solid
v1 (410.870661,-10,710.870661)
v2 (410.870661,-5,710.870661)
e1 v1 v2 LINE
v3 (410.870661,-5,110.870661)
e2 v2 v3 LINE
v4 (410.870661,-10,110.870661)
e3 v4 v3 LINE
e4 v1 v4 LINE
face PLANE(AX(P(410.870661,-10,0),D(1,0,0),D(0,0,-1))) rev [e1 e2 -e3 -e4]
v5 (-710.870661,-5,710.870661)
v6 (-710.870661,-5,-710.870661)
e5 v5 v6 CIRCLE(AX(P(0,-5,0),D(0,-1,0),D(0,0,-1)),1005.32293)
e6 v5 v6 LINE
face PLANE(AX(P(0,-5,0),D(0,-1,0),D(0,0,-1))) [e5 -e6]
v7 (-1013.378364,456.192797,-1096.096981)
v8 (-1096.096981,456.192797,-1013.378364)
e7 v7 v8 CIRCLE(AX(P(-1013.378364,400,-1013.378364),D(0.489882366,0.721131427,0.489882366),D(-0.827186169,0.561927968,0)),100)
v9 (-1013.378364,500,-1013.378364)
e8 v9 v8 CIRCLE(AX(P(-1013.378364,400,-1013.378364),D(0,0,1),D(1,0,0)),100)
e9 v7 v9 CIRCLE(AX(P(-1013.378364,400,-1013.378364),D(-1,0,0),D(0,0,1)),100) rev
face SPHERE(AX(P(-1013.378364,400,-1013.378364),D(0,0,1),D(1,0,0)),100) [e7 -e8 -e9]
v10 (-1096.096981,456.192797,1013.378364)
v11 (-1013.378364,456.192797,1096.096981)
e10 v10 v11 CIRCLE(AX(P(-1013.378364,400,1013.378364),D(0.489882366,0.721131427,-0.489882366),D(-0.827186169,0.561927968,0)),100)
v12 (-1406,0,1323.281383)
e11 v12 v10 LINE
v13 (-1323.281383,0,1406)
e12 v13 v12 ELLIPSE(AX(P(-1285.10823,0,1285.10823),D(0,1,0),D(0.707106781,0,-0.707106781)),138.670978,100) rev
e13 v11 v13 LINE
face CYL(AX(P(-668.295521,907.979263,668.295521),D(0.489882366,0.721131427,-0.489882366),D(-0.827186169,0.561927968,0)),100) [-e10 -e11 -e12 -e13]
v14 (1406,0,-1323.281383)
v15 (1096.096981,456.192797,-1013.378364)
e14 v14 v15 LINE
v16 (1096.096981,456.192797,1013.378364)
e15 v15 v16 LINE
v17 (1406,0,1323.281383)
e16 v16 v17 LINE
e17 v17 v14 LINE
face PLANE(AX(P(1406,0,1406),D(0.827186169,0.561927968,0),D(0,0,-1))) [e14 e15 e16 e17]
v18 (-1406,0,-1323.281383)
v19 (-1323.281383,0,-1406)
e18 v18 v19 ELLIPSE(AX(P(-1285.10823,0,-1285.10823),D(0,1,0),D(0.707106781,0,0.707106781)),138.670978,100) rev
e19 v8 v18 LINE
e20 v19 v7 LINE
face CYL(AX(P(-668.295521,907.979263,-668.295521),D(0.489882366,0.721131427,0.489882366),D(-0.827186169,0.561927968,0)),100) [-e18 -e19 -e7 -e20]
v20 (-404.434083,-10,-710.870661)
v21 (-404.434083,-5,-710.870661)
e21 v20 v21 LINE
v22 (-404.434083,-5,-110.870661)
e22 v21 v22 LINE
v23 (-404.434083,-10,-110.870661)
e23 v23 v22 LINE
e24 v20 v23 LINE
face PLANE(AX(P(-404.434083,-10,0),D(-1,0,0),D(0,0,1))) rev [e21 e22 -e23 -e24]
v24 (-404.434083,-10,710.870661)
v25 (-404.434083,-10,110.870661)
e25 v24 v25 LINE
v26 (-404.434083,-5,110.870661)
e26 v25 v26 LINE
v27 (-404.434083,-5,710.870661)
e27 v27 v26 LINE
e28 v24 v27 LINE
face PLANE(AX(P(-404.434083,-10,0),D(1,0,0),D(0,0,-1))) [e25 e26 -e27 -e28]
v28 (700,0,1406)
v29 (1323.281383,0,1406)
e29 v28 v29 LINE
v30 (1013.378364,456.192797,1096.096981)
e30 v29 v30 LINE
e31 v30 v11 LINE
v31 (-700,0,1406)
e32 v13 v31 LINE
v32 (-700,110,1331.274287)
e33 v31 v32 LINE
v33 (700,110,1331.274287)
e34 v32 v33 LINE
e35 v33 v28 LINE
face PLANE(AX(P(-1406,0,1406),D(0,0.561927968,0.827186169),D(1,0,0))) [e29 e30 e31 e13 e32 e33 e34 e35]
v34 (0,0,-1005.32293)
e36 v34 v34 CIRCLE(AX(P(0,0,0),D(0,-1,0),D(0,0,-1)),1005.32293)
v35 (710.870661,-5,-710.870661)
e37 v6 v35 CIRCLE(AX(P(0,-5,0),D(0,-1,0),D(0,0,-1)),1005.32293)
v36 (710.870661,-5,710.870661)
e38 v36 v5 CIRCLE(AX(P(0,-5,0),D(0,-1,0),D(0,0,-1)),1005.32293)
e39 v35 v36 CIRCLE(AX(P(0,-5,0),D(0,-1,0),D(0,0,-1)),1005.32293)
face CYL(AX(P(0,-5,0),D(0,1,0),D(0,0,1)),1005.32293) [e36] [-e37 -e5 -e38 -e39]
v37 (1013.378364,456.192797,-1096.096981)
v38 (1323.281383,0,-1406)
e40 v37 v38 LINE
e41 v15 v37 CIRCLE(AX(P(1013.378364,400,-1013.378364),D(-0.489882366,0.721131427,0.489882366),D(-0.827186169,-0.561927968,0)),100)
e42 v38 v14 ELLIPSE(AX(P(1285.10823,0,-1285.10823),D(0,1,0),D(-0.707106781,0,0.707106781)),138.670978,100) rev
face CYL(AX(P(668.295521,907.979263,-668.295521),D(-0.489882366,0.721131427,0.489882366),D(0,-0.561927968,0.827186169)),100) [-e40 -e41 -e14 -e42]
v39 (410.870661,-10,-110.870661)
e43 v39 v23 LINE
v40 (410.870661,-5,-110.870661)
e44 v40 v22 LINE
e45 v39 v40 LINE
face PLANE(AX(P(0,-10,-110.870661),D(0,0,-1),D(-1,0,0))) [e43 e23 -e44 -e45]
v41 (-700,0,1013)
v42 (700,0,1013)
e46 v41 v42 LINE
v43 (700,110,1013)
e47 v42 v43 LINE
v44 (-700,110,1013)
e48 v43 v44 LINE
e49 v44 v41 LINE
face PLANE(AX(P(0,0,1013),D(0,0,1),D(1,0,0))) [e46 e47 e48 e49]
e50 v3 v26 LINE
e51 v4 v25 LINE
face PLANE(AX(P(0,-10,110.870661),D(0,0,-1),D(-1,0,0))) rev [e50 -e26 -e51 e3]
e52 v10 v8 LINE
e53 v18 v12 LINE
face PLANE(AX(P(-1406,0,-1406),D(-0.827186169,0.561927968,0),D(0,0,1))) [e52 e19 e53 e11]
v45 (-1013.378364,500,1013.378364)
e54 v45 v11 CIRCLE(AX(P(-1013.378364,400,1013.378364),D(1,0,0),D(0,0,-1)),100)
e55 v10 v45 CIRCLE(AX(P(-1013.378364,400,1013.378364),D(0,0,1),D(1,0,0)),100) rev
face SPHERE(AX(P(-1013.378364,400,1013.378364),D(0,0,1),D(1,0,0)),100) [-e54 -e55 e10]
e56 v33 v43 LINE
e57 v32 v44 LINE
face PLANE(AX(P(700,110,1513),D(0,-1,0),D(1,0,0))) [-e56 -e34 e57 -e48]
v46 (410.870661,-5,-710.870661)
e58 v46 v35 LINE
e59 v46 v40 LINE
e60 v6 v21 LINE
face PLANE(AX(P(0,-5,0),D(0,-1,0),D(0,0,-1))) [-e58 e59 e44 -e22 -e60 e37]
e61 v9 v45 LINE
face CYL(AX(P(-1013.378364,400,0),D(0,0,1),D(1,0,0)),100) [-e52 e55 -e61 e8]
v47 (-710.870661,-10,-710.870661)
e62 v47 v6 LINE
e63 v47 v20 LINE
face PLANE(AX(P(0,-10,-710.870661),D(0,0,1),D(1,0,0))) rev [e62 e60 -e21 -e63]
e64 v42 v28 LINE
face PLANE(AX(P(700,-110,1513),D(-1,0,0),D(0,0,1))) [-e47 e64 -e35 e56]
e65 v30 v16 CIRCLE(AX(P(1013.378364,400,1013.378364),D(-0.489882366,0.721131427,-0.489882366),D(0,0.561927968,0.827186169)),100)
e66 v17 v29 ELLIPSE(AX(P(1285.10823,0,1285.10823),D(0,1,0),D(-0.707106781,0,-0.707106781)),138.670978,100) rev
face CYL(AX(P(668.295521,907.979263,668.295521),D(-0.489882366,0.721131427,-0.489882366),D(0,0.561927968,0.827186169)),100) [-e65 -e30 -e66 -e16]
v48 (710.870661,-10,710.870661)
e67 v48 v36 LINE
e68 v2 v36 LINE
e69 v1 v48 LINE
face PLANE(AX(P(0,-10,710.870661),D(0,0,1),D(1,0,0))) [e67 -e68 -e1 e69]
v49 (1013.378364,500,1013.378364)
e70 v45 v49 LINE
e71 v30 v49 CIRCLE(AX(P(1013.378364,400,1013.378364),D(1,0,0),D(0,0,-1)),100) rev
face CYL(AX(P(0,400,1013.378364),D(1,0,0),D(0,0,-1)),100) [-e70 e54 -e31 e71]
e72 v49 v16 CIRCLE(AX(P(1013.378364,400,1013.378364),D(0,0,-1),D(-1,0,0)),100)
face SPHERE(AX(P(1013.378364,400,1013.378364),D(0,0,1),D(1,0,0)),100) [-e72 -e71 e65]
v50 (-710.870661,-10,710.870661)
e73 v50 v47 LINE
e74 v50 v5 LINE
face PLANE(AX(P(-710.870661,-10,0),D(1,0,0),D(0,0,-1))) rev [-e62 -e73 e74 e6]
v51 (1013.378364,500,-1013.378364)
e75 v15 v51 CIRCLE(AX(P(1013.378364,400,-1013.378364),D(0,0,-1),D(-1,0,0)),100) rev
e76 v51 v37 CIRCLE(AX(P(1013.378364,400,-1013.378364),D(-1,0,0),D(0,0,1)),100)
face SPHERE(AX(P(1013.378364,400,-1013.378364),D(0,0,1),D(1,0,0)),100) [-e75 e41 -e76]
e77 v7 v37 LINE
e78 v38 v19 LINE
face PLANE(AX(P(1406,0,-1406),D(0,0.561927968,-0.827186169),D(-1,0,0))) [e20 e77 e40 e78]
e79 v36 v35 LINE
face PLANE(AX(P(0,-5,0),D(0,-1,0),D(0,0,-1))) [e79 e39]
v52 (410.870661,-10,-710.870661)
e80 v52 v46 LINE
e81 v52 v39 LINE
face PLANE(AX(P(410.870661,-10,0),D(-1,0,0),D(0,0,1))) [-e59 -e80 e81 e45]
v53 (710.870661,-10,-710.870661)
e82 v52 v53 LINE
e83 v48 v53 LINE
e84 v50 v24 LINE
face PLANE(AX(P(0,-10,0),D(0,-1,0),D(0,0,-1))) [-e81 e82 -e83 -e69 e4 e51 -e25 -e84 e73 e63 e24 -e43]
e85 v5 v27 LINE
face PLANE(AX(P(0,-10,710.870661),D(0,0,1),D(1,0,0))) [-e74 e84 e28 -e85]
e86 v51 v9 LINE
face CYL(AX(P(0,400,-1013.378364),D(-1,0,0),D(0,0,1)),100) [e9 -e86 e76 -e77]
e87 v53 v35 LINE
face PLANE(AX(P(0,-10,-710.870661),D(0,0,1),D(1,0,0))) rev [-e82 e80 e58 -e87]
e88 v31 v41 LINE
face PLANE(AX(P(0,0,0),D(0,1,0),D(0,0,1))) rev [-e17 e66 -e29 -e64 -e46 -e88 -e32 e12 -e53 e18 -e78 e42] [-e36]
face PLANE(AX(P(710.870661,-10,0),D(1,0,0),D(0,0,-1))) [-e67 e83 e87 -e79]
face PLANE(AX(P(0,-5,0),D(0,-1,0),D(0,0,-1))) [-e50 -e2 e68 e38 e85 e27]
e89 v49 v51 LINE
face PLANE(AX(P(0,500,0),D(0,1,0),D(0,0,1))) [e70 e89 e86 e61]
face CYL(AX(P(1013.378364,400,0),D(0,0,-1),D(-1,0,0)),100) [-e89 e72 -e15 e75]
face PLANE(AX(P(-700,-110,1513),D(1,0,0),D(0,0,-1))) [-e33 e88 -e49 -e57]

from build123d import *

# Parameters (mm, degrees)
LOFT1_OUTLINE_W     = 2132.6753346
LOFT1_OUTLINE_H     = 2132.6753346
LOFT1_DEPTH         = 500
LOFT1_DRAFT         = 34.1892347
FILLET1_R           = 100
FILLET2_R           = 100
CUT_EXTRUDE1_DEPTH  = 500
BOSS_EXTRUDE3_DEPTH = 10
SKETCH6_R           = 1005.3229303305633
BOSS_EXTRUDE4_DEPTH = 5


with BuildPart() as part:
    # Loft1: read off the stored shape, not the designer's step
    # Loft1 outline → Loft1 (with draft: the straight prism first)
    with BuildSketch(Plane(origin=(0, 500, 0), x_dir=(1, 0, 0), z_dir=(0, 1, 0))):
        Rectangle(LOFT1_OUTLINE_W, LOFT1_OUTLINE_H)
    extrude(amount=-LOFT1_DEPTH)
    # Loft1: the draft: its side faces are tilted about the plane it starts from
    loft1_sides = [part.faces().sort_by_distance(p)[0] for p in [
        (1066.3376673, 250, 0),
        (0, 250, -1066.3376673),
        (-1066.3376673, 250, 0),
        (0, 250, 1066.3376673),
    ]]
    draft(loft1_sides, Plane(origin=(0, 500, 0), x_dir=(1, 0, 0), z_dir=(0, 1, 0)), LOFT1_DRAFT)

    # Fillet1
    fillet1_edges = [part.edges().sort_by_distance(p)[0] for p in [
        (0, 500, -1066.3376673),
        (-1066.3376673, 500, 0),
        (0, 500, 1066.3376673),
        (1066.3376673, 500, 0),
    ]]
    fillet(fillet1_edges, radius=FILLET1_R)

    # Fillet2
    # the kernel refuses this fillet: 100 mm, written as the material it takes off along each edge
    with BuildSketch(Plane(origin=(-1013.3783640207519, 400, 1013.3783640207519), x_dir=(0.8421817639825007, 0.4460135945500142, -0.3029880358890411), z_dir=(-0.3411479339355868, 0.8759201871991312, 0.3411479339355868))) as fillet2_piece_1_section:
        Polygon((-149.92498415878302, -149.92498415878302), (149.92498415878302, -149.92498415878302), (149.92498415878302, 149.92498415878302), (-149.92498415878302, 149.92498415878302), align=None)
    fillet2_piece_1 = extrude(amount=149.92498415878302, mode=Mode.PRIVATE)
    fillet2_piece_1 = split(fillet2_piece_1, bisect_by=Plane(origin=(-1013.3783640207519, 400, 1013.3783640207519), z_dir=(0.4898823656610836, 0.7211314274309507, -0.4898823656610836)), keep=Keep.TOP, mode=Mode.PRIVATE)
    fillet2_piece_1 = split(fillet2_piece_1, bisect_by=Plane(origin=(-1013.3783640207519, 400, 1013.3783640207519), z_dir=(0, 0, 1)), keep=Keep.TOP, mode=Mode.PRIVATE)
    fillet2_piece_1 = split(fillet2_piece_1, bisect_by=Plane(origin=(-1013.3783640207519, 400, 1013.3783640207519), z_dir=(-1, 0, 0)), keep=Keep.TOP, mode=Mode.PRIVATE)
    fillet2_piece_1 = split(fillet2_piece_1, bisect_by=Plane(origin=(-1013.3783640207519, 456.19279678203594, 1096.09698096889), z_dir=(0, -0.5619279678203596, -0.8271861694813816)), keep=Keep.TOP, mode=Mode.PRIVATE)
    fillet2_piece_1 = split(fillet2_piece_1, bisect_by=Plane(origin=(-1096.09698096889, 456.19279678203594, 1013.3783640207519), z_dir=(0.8271861694813816, -0.5619279678203596, 0)), keep=Keep.TOP, mode=Mode.PRIVATE)
    fillet2_piece_1 = split(fillet2_piece_1, bisect_by=Plane(origin=(-1013.3783640207519, 500, 1013.3783640207519), z_dir=(0, -1, 0)), keep=Keep.TOP, mode=Mode.PRIVATE)
    fillet2_piece_1 = fillet2_piece_1 - Plane(origin=(-1013.3783640207519, 400, 1013.3783640207519), x_dir=(0.3411479339355868, -0.8759201871991312, -0.3411479339355868), z_dir=(0.8421817639825007, 0.4460135945500142, -0.3029880358890411)) * Sphere(FILLET2_R, mode=Mode.PRIVATE)
    with BuildSketch(Plane(origin=(1013.3783640207519, 400, 1013.3783640207519), x_dir=(-0.30298803588904116, 0.44601359455001427, -0.8421817639825008), z_dir=(0.3411479339355868, 0.8759201871991312, 0.3411479339355868))) as fillet2_piece_2_section:
        Polygon((-149.92498415878302, -149.92498415878302), (149.92498415878302, -149.92498415878302), (149.92498415878302, 149.92498415878302), (-149.92498415878302, 149.92498415878302), align=None)
    fillet2_piece_2 = extrude(amount=149.92498415878302, mode=Mode.PRIVATE)
    fillet2_piece_2 = split(fillet2_piece_2, bisect_by=Plane(origin=(1013.3783640207519, 400, 1013.3783640207519), z_dir=(-0.4898823656610836, 0.7211314274309507, -0.4898823656610836)), keep=Keep.TOP, mode=Mode.PRIVATE)
    fillet2_piece_2 = split(fillet2_piece_2, bisect_by=Plane(origin=(1013.3783640207519, 400, 1013.3783640207519), z_dir=(1, 0, 0)), keep=Keep.TOP, mode=Mode.PRIVATE)
    fillet2_piece_2 = split(fillet2_piece_2, bisect_by=Plane(origin=(1013.3783640207519, 400, 1013.3783640207519), z_dir=(0, 0, 1)), keep=Keep.TOP, mode=Mode.PRIVATE)
    fillet2_piece_2 = split(fillet2_piece_2, bisect_by=Plane(origin=(1096.09698096889, 456.19279678203594, 1013.3783640207519), z_dir=(-0.8271861694813816, -0.5619279678203596, 0)), keep=Keep.TOP, mode=Mode.PRIVATE)
    fillet2_piece_2 = split(fillet2_piece_2, bisect_by=Plane(origin=(1013.3783640207519, 456.19279678203594, 1096.09698096889), z_dir=(0, -0.5619279678203596, -0.8271861694813816)), keep=Keep.TOP, mode=Mode.PRIVATE)
    fillet2_piece_2 = split(fillet2_piece_2, bisect_by=Plane(origin=(1013.3783640207519, 500, 1013.3783640207519), z_dir=(0, -1, 0)), keep=Keep.TOP, mode=Mode.PRIVATE)
    fillet2_piece_2 = fillet2_piece_2 - Plane(origin=(1013.3783640207519, 400, 1013.3783640207519), x_dir=(-0.3411479339355868, -0.8759201871991312, -0.3411479339355868), z_dir=(-0.30298803588904116, 0.44601359455001427, -0.8421817639825008)) * Sphere(FILLET2_R, mode=Mode.PRIVATE)
    with BuildSketch(Plane(origin=(1013.3783640207519, 400, -1013.3783640207519), x_dir=(0.30298803588904116, -0.44601359455001427, -0.8421817639825008), z_dir=(0.3411479339355868, 0.8759201871991312, -0.3411479339355868))) as fillet2_piece_3_section:
        Polygon((-149.92498415878302, -149.92498415878302), (149.92498415878302, -149.92498415878302), (149.92498415878302, 149.92498415878302), (-149.92498415878302, 149.92498415878302), align=None)
    fillet2_piece_3 = extrude(amount=149.92498415878302, mode=Mode.PRIVATE)
    fillet2_piece_3 = split(fillet2_piece_3, bisect_by=Plane(origin=(1013.3783640207519, 400, -1013.3783640207519), z_dir=(-0.4898823656610836, 0.7211314274309507, 0.4898823656610836)), keep=Keep.TOP, mode=Mode.PRIVATE)
    fillet2_piece_3 = split(fillet2_piece_3, bisect_by=Plane(origin=(1013.3783640207519, 400, -1013.3783640207519), z_dir=(1, 0, 0)), keep=Keep.TOP, mode=Mode.PRIVATE)
    fillet2_piece_3 = split(fillet2_piece_3, bisect_by=Plane(origin=(1013.3783640207519, 400, -1013.3783640207519), z_dir=(0, 0, -1)), keep=Keep.TOP, mode=Mode.PRIVATE)
    fillet2_piece_3 = split(fillet2_piece_3, bisect_by=Plane(origin=(1096.09698096889, 456.19279678203594, -1013.3783640207519), z_dir=(-0.8271861694813816, -0.5619279678203596, 0)), keep=Keep.TOP, mode=Mode.PRIVATE)
    fillet2_piece_3 = split(fillet2_piece_3, bisect_by=Plane(origin=(1013.3783640207519, 456.19279678203594, -1096.09698096889), z_dir=(0, -0.5619279678203596, 0.8271861694813816)), keep=Keep.TOP, mode=Mode.PRIVATE)
    fillet2_piece_3 = split(fillet2_piece_3, bisect_by=Plane(origin=(1013.3783640207519, 500, -1013.3783640207519), z_dir=(0, -1, 0)), keep=Keep.TOP, mode=Mode.PRIVATE)
    fillet2_piece_3 = fillet2_piece_3 - Plane(origin=(1013.3783640207519, 400, -1013.3783640207519), x_dir=(-0.3411479339355868, -0.8759201871991312, 0.3411479339355868), z_dir=(0.30298803588904116, -0.44601359455001427, -0.8421817639825008)) * Sphere(FILLET2_R, mode=Mode.PRIVATE)
    with BuildSketch(Plane(origin=(-1013.3783640207519, 400, -1013.3783640207519), x_dir=(-0.8421817639825007, -0.4460135945500142, -0.3029880358890411), z_dir=(-0.3411479339355868, 0.8759201871991312, -0.3411479339355868))) as fillet2_piece_4_section:
        Polygon((-149.92498415878302, -149.92498415878302), (149.92498415878302, -149.92498415878302), (149.92498415878302, 149.92498415878302), (-149.92498415878302, 149.92498415878302), align=None)
    fillet2_piece_4 = extrude(amount=149.92498415878302, mode=Mode.PRIVATE)
    fillet2_piece_4 = split(fillet2_piece_4, bisect_by=Plane(origin=(-1013.3783640207519, 400, -1013.3783640207519), z_dir=(0.4898823656610836, 0.7211314274309507, 0.4898823656610836)), keep=Keep.TOP, mode=Mode.PRIVATE)
    fillet2_piece_4 = split(fillet2_piece_4, bisect_by=Plane(origin=(-1013.3783640207519, 400, -1013.3783640207519), z_dir=(0, 0, -1)), keep=Keep.TOP, mode=Mode.PRIVATE)
    fillet2_piece_4 = split(fillet2_piece_4, bisect_by=Plane(origin=(-1013.3783640207519, 400, -1013.3783640207519), z_dir=(-1, 0, 0)), keep=Keep.TOP, mode=Mode.PRIVATE)
    fillet2_piece_4 = split(fillet2_piece_4, bisect_by=Plane(origin=(-1013.3783640207519, 456.19279678203594, -1096.09698096889), z_dir=(0, -0.5619279678203596, 0.8271861694813816)), keep=Keep.TOP, mode=Mode.PRIVATE)
    fillet2_piece_4 = split(fillet2_piece_4, bisect_by=Plane(origin=(-1096.09698096889, 456.19279678203594, -1013.3783640207519), z_dir=(0.8271861694813816, -0.5619279678203596, 0)), keep=Keep.TOP, mode=Mode.PRIVATE)
    fillet2_piece_4 = split(fillet2_piece_4, bisect_by=Plane(origin=(-1013.3783640207519, 500, -1013.3783640207519), z_dir=(0, -1, 0)), keep=Keep.TOP, mode=Mode.PRIVATE)
    fillet2_piece_4 = fillet2_piece_4 - Plane(origin=(-1013.3783640207519, 400, -1013.3783640207519), x_dir=(0.3411479339355868, -0.8759201871991312, 0.3411479339355868), z_dir=(-0.8421817639825007, -0.4460135945500142, -0.3029880358890411)) * Sphere(FILLET2_R, mode=Mode.PRIVATE)
    with BuildSketch(Plane(origin=(-1076.2457758338196, 485.41476699106727, 1076.2457758338196), x_dir=(0.8717885453562122, -0.4052239175476701, 0.27527860220696176), z_dir=(-0.4898823656610837, -0.7211314274309508, 0.4898823656610837))) as fillet2_piece_5:
        with BuildLine():
            CenterArc((FILLET2_R * 0.721131427431, -FILLET2_R), FILLET2_R, 90.00000000000009, 71.5931159786692)
            Line((-FILLET2_R * 0.2277066525, -FILLET2_R * 0.684236958981), (0, 0))
            Line((0, 0), (FILLET2_R * 0.721131427431, -4.86e-15))
        make_face()
    fillet2_piece_5_solid = extrude(amount=853.4122595248351, mode=Mode.PRIVATE)
    with BuildSketch(Plane(origin=(1076.2457758338196, 485.41476699106727, 1076.2457758338196), x_dir=(0.27527860220696176, -0.4052239175476702, -0.8717885453562122), z_dir=(0.4898823656610837, -0.7211314274309508, 0.4898823656610837))) as fillet2_piece_6:
        with BuildLine():
            CenterArc((FILLET2_R * 0.721131427431, -FILLET2_R), FILLET2_R, 90.00000000000009, 71.5931159786692)
            Line((-FILLET2_R * 0.2277066525, -FILLET2_R * 0.684236958981), (0, 0))
            Line((0, 0), (FILLET2_R * 0.721131427431, -1.56e-15))
        make_face()
    fillet2_piece_6_solid = extrude(amount=853.4122595248351, mode=Mode.PRIVATE)
    with BuildSketch(Plane(origin=(1076.2457758338196, 485.41476699106727, -1076.2457758338196), x_dir=(0.27527860220696176, -0.4052239175476702, 0.8717885453562122), z_dir=(0.4898823656610837, -0.7211314274309508, -0.4898823656610837))) as fillet2_piece_7:
        with BuildLine():
            CenterArc((FILLET2_R * 0.721131427431, FILLET2_R), FILLET2_R, 198.4068840213307, 71.59311597866918)
            Line((-FILLET2_R * 0.2277066525, FILLET2_R * 0.684236958981), (0, 0))
            Line((0, 0), (FILLET2_R * 0.721131427431, 1.56e-15))
        make_face()
    fillet2_piece_7_solid = extrude(amount=853.4122595248351, mode=Mode.PRIVATE)
    with BuildSketch(Plane(origin=(-1076.2457758338196, 485.41476699106727, -1076.2457758338196), x_dir=(0.8717885453562122, -0.4052239175476701, -0.27527860220696176), z_dir=(-0.4898823656610837, -0.7211314274309508, -0.4898823656610837))) as fillet2_piece_8:
        with BuildLine():
            CenterArc((FILLET2_R * 0.721131427431, FILLET2_R), FILLET2_R, 198.4068840213307, 71.59311597866918)
            Line((-FILLET2_R * 0.2277066525, FILLET2_R * 0.684236958981), (0, 0))
            Line((0, 0), (FILLET2_R * 0.721131427431, 4.86e-15))
        make_face()
    fillet2_piece_8_solid = extrude(amount=853.4122595248351, mode=Mode.PRIVATE)
    add([fillet2_piece_1, fillet2_piece_2, fillet2_piece_3, fillet2_piece_4, fillet2_piece_5_solid, fillet2_piece_6_solid, fillet2_piece_7_solid, fillet2_piece_8_solid], mode=Mode.SUBTRACT)

    # Sketch4 → Cut-Extrude1 (cut)
    with BuildSketch(Plane.XY.offset(1012.9999999999999)):
        Polygon((700, -109.9999999999999), (-700, -110.00000000000009), (-700, 109.99999999999994), (700, 110.0000000000001), align=None)
    extrude(amount=CUT_EXTRUDE1_DEPTH, mode=Mode.SUBTRACT)

    # Sketch5 → Boss-Extrude3 (add)
    with BuildSketch(Plane.XZ):
        Polygon((-710.8706613190724, 710.8706613190723), (-404.4340828727684, 710.8706613190723), (-404.4340828727684, 110.87066131907231), (410.87066131907216, 110.87066131907231), (410.87066131907216, 710.8706613190723), (710.8706613190722, 710.8706613190723), (710.8706613190724, -710.8706613190723), (410.87066131907216, -710.8706613190723), (410.87066131907216, -110.87066131907231), (-404.4340828727684, -110.87066131907231), (-404.4340828727684, -710.8706613190723), (-710.8706613190722, -710.8706613190723), align=None)
    extrude(amount=BOSS_EXTRUDE3_DEPTH)

    # Sketch6 → Boss-Extrude4 (add)
    with BuildSketch(Plane.XZ):
        with Locations(Location((0, 0, 0), (0, 0, 135))):
            Circle(SKETCH6_R)
    extrude(amount=BOSS_EXTRUDE4_DEPTH)


solid = part.part
